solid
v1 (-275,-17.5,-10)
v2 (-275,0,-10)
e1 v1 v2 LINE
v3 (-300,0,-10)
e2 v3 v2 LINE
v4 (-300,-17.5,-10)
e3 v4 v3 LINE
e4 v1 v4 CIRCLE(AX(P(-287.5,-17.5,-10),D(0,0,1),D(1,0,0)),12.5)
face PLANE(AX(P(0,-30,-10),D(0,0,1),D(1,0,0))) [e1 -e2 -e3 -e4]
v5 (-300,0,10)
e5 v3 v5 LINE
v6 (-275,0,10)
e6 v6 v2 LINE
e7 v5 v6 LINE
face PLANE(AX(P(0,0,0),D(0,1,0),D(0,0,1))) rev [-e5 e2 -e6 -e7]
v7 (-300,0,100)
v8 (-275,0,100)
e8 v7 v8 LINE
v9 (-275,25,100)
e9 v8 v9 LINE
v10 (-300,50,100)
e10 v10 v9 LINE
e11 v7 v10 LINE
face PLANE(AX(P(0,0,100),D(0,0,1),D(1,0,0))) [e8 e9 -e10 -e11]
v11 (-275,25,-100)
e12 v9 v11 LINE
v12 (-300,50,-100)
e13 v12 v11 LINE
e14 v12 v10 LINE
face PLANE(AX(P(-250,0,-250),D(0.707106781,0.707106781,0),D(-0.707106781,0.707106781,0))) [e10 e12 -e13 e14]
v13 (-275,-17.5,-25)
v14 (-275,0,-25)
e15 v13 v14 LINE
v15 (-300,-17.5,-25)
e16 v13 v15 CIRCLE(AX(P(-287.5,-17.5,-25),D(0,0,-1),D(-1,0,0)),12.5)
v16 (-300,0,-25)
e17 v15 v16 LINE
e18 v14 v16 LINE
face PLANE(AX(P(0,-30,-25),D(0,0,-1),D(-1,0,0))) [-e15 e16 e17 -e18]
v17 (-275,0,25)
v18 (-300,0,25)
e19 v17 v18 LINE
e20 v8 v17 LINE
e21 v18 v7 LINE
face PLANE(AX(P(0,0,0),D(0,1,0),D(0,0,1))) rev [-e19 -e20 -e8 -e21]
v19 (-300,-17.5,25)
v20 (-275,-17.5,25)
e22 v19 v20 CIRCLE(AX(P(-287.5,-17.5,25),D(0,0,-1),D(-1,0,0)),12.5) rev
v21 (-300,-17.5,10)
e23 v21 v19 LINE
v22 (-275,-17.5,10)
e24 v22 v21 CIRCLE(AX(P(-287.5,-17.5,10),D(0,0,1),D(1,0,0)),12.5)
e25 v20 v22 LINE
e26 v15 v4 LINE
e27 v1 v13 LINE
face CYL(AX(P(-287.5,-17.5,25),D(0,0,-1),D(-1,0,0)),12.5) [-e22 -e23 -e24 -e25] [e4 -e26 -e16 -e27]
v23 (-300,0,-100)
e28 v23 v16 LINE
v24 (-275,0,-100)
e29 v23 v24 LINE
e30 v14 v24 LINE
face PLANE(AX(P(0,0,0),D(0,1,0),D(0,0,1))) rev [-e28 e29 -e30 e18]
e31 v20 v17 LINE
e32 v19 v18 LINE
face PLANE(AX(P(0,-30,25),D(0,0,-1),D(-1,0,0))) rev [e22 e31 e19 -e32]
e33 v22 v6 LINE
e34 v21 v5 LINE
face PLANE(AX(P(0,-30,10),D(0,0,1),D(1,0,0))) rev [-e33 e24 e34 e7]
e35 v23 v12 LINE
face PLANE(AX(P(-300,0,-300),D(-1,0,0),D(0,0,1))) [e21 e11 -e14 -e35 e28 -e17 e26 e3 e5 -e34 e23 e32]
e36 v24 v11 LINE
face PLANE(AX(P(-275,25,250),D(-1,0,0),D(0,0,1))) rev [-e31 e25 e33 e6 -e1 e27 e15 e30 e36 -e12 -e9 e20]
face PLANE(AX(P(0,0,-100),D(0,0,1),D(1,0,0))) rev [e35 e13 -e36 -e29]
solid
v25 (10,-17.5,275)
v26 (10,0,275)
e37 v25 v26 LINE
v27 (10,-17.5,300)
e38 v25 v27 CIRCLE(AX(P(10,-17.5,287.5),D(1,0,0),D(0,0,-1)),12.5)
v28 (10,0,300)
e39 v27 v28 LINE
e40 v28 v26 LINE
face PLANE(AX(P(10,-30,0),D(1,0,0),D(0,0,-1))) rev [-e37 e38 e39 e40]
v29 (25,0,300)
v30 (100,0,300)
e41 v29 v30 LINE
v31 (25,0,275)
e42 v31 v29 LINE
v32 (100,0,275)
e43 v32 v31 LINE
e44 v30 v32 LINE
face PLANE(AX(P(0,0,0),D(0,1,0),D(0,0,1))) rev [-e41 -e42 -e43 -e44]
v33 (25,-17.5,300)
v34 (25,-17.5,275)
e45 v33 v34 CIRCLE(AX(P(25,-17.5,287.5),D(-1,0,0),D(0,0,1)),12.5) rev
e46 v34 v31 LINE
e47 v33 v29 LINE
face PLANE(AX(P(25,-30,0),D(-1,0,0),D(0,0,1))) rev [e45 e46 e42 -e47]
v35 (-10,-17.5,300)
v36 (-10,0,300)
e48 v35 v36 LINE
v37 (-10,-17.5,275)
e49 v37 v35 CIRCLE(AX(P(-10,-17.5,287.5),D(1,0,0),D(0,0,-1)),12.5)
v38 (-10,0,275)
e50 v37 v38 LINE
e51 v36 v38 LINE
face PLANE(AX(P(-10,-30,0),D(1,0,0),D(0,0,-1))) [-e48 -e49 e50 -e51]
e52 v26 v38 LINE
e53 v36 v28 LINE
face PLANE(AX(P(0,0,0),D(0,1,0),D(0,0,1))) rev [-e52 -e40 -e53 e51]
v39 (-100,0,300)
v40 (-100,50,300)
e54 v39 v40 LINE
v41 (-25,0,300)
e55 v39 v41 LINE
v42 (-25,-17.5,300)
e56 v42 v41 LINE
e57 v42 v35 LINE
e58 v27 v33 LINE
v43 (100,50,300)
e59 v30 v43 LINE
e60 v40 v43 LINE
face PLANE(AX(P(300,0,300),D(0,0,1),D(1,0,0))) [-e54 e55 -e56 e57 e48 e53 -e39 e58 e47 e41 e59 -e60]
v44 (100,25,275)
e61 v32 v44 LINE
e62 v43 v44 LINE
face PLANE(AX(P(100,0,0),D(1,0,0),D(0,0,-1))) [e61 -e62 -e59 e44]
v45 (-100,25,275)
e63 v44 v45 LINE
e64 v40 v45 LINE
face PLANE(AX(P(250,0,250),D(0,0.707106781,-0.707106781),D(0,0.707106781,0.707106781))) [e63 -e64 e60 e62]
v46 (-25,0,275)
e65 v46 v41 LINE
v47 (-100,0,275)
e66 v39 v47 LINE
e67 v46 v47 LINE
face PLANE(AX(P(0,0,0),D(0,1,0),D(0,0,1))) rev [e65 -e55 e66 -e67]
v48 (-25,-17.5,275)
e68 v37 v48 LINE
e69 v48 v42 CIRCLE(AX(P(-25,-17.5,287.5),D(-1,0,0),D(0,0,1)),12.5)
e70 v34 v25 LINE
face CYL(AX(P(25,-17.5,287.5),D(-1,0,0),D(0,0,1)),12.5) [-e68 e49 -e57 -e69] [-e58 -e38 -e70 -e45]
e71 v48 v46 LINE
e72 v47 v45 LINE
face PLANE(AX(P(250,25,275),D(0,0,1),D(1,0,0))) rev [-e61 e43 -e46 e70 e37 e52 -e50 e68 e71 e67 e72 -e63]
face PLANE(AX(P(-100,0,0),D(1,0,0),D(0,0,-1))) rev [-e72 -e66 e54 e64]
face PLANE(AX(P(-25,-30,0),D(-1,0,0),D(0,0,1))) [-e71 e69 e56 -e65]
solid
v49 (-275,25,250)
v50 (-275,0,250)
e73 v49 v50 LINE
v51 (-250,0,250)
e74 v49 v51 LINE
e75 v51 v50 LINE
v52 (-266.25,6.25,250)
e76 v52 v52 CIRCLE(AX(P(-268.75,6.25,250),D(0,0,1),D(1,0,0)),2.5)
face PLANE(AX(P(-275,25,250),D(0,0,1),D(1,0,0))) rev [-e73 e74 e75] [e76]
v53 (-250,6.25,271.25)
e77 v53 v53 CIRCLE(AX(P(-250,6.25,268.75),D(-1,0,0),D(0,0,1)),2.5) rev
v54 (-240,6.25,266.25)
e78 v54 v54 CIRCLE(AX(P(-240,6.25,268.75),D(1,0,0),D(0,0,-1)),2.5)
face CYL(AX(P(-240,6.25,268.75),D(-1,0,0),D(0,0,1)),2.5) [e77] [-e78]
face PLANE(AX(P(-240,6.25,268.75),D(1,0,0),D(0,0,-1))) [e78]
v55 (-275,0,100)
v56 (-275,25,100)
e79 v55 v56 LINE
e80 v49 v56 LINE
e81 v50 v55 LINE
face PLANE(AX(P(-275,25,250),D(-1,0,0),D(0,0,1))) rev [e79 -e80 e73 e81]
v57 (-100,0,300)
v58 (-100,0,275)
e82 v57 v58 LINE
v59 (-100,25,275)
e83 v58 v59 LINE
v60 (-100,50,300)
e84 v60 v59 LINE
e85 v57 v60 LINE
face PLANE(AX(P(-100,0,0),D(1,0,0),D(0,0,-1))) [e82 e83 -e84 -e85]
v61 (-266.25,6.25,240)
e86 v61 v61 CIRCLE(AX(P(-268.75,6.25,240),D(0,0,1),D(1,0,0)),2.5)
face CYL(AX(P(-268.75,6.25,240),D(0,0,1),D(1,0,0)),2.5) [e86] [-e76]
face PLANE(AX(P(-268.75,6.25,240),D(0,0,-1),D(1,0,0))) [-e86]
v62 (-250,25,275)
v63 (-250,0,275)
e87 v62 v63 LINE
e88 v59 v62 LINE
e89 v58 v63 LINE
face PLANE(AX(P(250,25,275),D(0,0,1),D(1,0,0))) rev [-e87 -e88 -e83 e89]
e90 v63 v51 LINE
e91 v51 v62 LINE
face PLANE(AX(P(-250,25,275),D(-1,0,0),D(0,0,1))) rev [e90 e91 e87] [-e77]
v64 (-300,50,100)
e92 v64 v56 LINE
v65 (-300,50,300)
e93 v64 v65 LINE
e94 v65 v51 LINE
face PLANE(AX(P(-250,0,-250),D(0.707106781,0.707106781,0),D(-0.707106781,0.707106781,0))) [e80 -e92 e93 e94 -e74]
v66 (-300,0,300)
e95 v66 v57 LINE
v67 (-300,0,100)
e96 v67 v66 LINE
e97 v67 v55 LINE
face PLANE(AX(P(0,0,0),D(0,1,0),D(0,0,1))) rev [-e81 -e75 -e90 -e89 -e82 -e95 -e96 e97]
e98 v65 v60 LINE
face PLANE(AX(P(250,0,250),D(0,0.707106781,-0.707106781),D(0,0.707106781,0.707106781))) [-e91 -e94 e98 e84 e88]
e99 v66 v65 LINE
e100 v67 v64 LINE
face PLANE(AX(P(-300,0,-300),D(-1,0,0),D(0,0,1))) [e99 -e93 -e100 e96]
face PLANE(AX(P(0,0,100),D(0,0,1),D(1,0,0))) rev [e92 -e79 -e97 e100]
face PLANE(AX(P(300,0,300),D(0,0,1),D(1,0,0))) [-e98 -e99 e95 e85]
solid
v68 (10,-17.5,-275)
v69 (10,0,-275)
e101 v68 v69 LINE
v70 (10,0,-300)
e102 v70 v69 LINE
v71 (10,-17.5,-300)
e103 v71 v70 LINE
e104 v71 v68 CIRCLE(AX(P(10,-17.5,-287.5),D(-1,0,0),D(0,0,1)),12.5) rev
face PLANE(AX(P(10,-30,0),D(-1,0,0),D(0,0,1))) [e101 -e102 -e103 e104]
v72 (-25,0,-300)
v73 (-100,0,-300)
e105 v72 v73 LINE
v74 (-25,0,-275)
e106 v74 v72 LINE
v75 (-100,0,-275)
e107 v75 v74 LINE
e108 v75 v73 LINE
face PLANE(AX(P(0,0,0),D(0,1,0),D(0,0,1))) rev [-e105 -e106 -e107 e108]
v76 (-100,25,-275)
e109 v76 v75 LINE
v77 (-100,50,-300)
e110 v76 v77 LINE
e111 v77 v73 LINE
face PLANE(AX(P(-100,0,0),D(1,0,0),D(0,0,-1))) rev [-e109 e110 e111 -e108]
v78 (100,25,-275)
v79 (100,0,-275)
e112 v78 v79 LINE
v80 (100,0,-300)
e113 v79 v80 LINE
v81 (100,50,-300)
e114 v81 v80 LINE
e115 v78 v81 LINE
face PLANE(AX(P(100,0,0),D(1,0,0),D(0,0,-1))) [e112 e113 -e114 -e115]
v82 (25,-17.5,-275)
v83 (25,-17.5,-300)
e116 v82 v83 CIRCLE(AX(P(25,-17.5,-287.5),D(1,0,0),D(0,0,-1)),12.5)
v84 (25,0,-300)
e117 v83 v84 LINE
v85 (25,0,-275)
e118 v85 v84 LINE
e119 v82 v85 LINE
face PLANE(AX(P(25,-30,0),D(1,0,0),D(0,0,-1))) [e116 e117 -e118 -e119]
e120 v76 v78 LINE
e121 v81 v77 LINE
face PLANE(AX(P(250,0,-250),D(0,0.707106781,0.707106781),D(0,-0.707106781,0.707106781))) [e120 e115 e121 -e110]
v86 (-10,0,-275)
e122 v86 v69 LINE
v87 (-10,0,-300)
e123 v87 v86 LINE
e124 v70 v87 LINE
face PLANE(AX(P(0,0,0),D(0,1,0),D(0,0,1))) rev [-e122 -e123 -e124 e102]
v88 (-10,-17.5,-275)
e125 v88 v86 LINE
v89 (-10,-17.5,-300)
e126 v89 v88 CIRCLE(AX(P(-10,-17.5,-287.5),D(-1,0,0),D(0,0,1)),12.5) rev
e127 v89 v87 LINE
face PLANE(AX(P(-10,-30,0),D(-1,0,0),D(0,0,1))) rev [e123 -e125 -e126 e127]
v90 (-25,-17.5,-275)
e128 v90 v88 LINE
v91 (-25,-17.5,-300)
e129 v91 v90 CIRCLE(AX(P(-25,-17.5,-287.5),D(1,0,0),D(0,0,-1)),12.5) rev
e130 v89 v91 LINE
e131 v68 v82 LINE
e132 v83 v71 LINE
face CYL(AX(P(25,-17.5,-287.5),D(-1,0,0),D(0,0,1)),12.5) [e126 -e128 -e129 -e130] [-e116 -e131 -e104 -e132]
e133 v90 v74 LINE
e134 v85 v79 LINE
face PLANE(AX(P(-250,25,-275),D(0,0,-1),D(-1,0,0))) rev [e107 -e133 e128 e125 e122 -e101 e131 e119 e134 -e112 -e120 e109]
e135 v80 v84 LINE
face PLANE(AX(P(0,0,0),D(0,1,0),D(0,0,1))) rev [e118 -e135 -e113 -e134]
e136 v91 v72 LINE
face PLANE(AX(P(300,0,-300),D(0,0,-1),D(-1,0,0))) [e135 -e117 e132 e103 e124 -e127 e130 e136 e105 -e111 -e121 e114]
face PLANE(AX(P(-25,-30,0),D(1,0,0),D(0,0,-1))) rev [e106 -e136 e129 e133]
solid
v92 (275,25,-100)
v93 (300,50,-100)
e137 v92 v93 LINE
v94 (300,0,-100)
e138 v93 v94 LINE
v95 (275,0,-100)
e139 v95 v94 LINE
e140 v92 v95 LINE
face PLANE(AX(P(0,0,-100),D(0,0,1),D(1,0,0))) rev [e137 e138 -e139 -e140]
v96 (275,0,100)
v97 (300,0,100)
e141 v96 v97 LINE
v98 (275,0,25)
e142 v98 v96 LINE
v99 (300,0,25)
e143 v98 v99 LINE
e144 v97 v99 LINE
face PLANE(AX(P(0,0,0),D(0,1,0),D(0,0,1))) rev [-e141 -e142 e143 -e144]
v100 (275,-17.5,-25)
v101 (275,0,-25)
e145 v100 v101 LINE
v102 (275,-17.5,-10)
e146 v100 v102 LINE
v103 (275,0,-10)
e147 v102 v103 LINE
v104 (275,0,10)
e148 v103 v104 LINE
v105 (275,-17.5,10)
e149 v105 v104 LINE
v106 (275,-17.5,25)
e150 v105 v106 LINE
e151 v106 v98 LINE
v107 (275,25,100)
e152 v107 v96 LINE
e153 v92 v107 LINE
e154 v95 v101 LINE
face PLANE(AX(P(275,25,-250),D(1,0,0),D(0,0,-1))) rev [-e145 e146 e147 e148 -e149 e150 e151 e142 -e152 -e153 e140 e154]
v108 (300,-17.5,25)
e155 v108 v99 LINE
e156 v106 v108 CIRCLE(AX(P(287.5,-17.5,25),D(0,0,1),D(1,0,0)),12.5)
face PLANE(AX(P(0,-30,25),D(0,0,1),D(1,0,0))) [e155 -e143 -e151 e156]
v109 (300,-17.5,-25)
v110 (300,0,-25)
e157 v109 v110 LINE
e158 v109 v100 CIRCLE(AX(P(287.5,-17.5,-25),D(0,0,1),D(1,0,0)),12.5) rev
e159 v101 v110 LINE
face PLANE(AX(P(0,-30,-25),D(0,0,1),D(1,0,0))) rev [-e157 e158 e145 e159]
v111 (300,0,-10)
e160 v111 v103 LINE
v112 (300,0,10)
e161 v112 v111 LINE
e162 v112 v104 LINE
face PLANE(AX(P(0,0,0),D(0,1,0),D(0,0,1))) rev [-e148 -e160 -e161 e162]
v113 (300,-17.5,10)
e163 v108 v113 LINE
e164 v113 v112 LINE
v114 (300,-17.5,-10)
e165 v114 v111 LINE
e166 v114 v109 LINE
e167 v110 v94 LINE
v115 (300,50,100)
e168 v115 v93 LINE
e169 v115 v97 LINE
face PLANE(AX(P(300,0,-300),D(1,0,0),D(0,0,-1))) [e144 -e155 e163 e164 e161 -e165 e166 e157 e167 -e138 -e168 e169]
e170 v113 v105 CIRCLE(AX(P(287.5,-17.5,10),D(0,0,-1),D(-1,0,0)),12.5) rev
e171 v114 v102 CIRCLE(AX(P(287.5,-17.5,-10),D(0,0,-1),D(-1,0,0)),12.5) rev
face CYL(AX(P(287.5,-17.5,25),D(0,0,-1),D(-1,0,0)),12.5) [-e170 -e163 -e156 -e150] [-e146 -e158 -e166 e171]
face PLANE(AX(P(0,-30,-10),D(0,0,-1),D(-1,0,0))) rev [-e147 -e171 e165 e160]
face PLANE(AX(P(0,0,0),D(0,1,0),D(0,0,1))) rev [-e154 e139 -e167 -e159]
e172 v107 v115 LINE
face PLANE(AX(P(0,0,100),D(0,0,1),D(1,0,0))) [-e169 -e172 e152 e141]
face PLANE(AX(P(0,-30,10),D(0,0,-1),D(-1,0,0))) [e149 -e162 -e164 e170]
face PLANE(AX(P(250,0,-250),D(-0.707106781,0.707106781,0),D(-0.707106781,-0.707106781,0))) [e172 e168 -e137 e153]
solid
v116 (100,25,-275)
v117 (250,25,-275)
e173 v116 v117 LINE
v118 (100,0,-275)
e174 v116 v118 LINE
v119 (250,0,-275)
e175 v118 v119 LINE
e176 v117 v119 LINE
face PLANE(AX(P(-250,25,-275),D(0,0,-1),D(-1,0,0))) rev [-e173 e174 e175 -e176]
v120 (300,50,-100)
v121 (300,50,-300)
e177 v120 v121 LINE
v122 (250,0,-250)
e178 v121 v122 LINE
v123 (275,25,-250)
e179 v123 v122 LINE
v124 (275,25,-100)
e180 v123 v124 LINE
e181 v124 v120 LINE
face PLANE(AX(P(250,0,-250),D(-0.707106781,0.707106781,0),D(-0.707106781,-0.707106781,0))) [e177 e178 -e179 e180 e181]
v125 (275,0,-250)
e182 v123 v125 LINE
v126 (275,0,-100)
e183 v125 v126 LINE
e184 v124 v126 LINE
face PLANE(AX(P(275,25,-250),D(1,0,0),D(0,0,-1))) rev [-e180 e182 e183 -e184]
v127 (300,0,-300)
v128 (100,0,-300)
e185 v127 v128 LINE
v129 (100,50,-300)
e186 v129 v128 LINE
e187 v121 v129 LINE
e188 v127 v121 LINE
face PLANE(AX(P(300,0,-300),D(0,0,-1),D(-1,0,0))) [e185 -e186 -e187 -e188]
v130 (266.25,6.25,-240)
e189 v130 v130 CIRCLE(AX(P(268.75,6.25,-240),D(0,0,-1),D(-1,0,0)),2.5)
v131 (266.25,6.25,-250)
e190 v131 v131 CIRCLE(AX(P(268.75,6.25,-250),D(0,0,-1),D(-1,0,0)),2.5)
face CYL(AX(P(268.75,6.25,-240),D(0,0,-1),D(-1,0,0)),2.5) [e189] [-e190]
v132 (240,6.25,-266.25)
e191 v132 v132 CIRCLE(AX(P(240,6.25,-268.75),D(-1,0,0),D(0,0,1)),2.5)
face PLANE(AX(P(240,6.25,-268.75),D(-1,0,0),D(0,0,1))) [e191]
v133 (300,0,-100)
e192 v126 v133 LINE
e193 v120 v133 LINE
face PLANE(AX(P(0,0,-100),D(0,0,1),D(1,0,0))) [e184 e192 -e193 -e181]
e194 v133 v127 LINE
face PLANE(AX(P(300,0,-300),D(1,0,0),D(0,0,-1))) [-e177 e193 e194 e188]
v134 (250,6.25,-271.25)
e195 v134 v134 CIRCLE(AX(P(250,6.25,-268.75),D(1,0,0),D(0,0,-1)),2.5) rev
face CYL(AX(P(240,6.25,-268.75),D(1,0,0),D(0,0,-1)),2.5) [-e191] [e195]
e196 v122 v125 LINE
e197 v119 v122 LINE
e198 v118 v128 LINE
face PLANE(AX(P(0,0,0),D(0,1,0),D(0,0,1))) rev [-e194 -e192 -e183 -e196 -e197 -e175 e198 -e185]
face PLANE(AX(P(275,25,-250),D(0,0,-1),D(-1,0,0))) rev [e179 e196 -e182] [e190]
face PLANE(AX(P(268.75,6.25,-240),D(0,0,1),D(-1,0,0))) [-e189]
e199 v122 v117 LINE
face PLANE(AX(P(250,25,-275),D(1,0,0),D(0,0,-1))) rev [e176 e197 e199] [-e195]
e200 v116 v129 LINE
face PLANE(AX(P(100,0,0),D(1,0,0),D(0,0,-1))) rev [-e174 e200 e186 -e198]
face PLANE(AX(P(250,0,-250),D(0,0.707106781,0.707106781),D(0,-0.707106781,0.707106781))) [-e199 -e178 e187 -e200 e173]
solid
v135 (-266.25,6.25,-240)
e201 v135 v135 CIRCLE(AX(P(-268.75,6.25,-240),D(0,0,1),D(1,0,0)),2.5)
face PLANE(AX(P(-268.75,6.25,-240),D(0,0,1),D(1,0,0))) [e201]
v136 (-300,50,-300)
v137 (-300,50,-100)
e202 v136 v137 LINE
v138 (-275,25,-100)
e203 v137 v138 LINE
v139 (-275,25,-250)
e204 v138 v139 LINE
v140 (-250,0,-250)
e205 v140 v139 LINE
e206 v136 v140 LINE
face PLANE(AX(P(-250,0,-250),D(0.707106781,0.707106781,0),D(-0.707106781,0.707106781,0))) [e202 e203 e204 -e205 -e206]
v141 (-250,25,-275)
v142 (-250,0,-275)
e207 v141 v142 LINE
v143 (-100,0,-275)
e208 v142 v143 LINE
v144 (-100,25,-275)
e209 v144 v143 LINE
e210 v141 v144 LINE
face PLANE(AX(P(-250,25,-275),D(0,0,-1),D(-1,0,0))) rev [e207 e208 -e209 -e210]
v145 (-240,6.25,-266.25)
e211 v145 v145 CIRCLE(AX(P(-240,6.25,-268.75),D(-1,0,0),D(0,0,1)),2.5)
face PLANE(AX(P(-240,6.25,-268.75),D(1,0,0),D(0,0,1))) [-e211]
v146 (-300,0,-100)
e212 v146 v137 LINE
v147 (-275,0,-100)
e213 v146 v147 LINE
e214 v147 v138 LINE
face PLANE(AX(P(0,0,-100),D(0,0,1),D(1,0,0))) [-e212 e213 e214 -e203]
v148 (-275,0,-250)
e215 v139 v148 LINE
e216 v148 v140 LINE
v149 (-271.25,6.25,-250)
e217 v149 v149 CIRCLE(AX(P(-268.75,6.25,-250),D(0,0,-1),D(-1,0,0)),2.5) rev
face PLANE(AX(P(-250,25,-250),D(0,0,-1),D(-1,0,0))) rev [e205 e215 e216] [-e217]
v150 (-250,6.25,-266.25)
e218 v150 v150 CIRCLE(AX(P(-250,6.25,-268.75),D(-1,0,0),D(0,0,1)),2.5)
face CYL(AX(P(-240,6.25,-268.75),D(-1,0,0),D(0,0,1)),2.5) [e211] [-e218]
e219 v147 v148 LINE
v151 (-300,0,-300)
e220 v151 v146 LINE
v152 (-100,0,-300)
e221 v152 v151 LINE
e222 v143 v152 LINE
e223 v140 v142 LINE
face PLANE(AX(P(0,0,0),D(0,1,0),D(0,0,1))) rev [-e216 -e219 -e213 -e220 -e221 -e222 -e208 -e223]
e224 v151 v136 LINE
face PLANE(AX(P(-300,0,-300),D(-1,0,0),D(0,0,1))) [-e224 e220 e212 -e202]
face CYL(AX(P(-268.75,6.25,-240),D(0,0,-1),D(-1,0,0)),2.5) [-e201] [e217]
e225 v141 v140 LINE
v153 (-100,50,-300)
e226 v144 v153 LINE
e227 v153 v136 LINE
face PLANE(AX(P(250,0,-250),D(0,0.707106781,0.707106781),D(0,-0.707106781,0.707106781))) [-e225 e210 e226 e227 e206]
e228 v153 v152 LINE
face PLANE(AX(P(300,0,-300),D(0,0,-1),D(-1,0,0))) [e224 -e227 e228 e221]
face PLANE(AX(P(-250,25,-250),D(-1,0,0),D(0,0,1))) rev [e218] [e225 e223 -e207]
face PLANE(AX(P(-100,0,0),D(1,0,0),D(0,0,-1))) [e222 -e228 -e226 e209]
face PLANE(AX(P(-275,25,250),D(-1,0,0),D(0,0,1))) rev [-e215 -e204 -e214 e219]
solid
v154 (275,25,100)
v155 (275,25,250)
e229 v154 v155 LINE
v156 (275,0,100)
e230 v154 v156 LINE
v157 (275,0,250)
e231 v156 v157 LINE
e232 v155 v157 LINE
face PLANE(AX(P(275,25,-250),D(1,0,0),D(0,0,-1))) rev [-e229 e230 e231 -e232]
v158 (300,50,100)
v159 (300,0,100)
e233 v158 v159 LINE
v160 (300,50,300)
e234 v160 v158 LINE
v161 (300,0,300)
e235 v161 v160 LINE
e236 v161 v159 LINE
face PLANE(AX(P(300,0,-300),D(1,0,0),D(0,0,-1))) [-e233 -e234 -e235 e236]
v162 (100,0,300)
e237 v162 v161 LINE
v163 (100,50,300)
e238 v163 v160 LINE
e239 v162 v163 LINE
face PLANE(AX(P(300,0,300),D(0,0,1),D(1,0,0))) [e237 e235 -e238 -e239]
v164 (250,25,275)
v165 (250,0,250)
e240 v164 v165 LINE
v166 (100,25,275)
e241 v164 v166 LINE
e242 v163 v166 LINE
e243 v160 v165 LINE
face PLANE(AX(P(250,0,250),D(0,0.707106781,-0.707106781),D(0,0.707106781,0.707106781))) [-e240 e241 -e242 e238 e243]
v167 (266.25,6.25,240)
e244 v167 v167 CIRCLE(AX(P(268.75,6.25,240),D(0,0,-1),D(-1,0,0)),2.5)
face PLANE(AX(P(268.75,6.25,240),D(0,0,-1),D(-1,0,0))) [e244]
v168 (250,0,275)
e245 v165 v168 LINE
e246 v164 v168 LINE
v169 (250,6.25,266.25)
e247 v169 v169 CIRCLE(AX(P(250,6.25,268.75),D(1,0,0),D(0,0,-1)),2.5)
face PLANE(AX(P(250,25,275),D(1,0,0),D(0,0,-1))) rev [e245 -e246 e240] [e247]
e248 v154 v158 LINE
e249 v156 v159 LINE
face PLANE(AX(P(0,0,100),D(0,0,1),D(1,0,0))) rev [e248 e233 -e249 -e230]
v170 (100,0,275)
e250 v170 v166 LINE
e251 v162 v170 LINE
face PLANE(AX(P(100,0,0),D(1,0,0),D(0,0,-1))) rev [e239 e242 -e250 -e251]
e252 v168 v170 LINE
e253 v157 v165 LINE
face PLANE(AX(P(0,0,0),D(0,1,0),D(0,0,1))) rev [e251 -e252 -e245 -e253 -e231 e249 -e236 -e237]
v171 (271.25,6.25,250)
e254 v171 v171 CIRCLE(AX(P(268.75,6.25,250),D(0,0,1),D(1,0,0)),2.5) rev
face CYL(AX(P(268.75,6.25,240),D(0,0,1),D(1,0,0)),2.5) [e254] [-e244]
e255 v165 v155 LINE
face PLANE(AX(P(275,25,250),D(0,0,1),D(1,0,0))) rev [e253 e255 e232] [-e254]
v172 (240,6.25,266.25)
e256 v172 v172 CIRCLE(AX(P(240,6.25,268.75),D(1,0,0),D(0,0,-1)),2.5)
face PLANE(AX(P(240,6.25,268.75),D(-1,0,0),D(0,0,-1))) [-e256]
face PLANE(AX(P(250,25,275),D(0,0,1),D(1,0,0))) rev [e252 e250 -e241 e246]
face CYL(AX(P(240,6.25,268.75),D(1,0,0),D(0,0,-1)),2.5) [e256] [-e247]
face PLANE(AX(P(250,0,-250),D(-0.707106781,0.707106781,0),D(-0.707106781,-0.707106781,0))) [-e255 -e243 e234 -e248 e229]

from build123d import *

# Parameters (mm, degrees)
SKETCH1_W                                  = 700
SKETCH1_H                                  = 700
SKETCH1_W_2                                = 500
SKETCH1_H_2                                = 500
BOSS_EXTRUDE2_DEPTH                        = 50
BOSS_EXTRUDE2_DRAFT                        = 45
SKETCH6_W                                  = 700
SKETCH6_H                                  = 700
SKETCH6_W_2                                = 600
SKETCH6_H_2                                = 600
CUT_EXTRUDE1_DEPTH                         = 50
CUT_EXTRUDE2_DEPTH                         = 25
SKETCH8_R                                  = 2.5
BOSS_EXTRUDE3_DEPTH                        = 10
MIRROR1_AT_THE_SECOND_PLANE_COPY_1_SKETC_R = 2.5
MIRROR1_AT_THE_SECOND_PLANE_COPY_1_DEPTH   = 10
MIRROR2_COPY_1_SKETCH_R                    = 2.5
MIRROR2_COPY_1_DEPTH                       = 10
MIRROR2_COPY_2_SKETCH_R                    = 2.5
MIRROR2_COPY_2_DEPTH                       = 10
MIRROR2_COPY_3_SKETCH_R                    = 2.5
MIRROR2_COPY_3_DEPTH                       = 10
SKETCH9_W                                  = 25
SKETCH9_H                                  = 15
BOSS_EXTRUDE4_DEPTH                        = 30
SKETCH11_R                                 = 12.5
BOSS_EXTRUDE5_DEPTH                        = 50
FILLET1_R                                  = 12.5
FILLET1_OF_MIRROR3_R                       = 12.5
MIRROR4_START                              = -25
MIRROR4_OUTLINE_R                          = 12.5
MIRROR4_DEPTH                              = 50
MIRROR4_2_DEPTH                            = 15
MIRROR4_START_2                            = 10
MIRROR4_3_DEPTH                            = 15
INTERSECT1_START                           = -300
INTERSECT1_DEPTH                           = 200
INTERSECT1_2_DEPTH                         = 50
INTERSECT1_START_2                         = -250
INTERSECT1_3_OUTLINE_R                     = 2.5
INTERSECT1_3_DEPTH                         = 10
INTERSECT1_4_DEPTH                         = 200
INTERSECT1_START_3                         = -279.452
INTERSECT1_5_DEPTH                         = 29.452
INTERSECT1_6_OUTLINE_R                     = 2.5
INTERSECT1_6_DEPTH                         = 10
INTERSECT1_7_DEPTH                         = 600
INTERSECT1_8_DEPTH                         = 200
INTERSECT1_START_4                         = 100
INTERSECT1_9_DEPTH                         = 200
INTERSECT1_START_5                         = -100
INTERSECT1_10_DEPTH                        = 200
INTERSECT1_START_6                         = -25
INTERSECT1_11_OUTLINE_R                    = 12.5
INTERSECT1_11_DEPTH                        = 50
INTERSECT1_12_DEPTH                        = 15
INTERSECT1_START_7                         = 10
INTERSECT1_13_DEPTH                        = 15
INTERSECT1_14_DEPTH                        = 200
INTERSECT1_START_8                         = 250
INTERSECT1_15_DEPTH                        = 50
INTERSECT1_START_9                         = 240
INTERSECT1_16_OUTLINE_R                    = 2.5
INTERSECT1_16_DEPTH                        = 10
INTERSECT1_17_DEPTH                        = 200
INTERSECT1_START_10                        = -280.548
INTERSECT1_18_DEPTH                        = 30.548
INTERSECT1_19_OUTLINE_R                    = 2.5
INTERSECT1_19_DEPTH                        = 10
INTERSECT1_20_DEPTH                        = 200
INTERSECT1_21_OUTLINE_R                    = 12.5
INTERSECT1_21_DEPTH                        = 50
INTERSECT1_22_DEPTH                        = 15
INTERSECT1_23_DEPTH                        = 15
INTERSECT1_24_DEPTH                        = 200
INTERSECT1_25_OUTLINE_R                    = 12.5
INTERSECT1_25_DEPTH                        = 50
INTERSECT1_26_DEPTH                        = 15
INTERSECT1_27_DEPTH                        = 15
INTERSECT1_28_DEPTH                        = 200
INTERSECT1_29_DEPTH                        = 50
INTERSECT1_30_OUTLINE_R                    = 2.5
INTERSECT1_30_DEPTH                        = 10
INTERSECT1_31_DEPTH                        = 200
INTERSECT1_32_DEPTH                        = 30.548
INTERSECT1_33_OUTLINE_R                    = 2.5
INTERSECT1_33_DEPTH                        = 10
INTERSECT1_34_DEPTH                        = 200
INTERSECT1_35_DEPTH                        = 50
INTERSECT1_36_OUTLINE_R                    = 2.5
INTERSECT1_36_DEPTH                        = 10
INTERSECT1_37_DEPTH                        = 200
INTERSECT1_38_DEPTH                        = 30.548
INTERSECT1_39_OUTLINE_R                    = 2.5
INTERSECT1_39_DEPTH                        = 10


with BuildPart() as part:
    # Sketch1 → Boss-Extrude2 (with draft: the straight prism first)
    with BuildSketch(Plane(origin=(0, 0, 0), x_dir=(1, 0, 0), z_dir=(0, 1, 0))):
        Rectangle(SKETCH1_W, SKETCH1_H)
        Rectangle(SKETCH1_W_2, SKETCH1_H_2, mode=Mode.SUBTRACT)
    extrude(amount=BOSS_EXTRUDE2_DEPTH)
    # Boss-Extrude2: the draft: its side faces are tilted about the plane it starts from
    boss_extrude2_sides = [part.faces().sort_by_distance(p)[0] for p in [
        (-350, 25, 0),
        (0, 25, 350),
        (350, 25, 0),
        (0, 25, -350),
        (250, 25, 0),
        (0, 25, 250),
        (-250, 25, 0),
        (0, 25, -250),
    ]]
    draft(boss_extrude2_sides, Plane(origin=(0, 0, 0), x_dir=(1, 0, 0), z_dir=(0, 1, 0)), BOSS_EXTRUDE2_DRAFT)

    # Sketch6 → Cut-Extrude1 (cut)
    with BuildSketch(Plane(origin=(0, 50, 0), x_dir=(1, 0, 0), z_dir=(0, 1, 0))):
        Rectangle(SKETCH6_W, SKETCH6_H)
        Rectangle(SKETCH6_W_2, SKETCH6_H_2, mode=Mode.SUBTRACT)
    extrude(amount=-CUT_EXTRUDE1_DEPTH, mode=Mode.SUBTRACT)

    # Sketch7 → Cut-Extrude2 (cut)
    with BuildSketch(Plane.XZ):
        Polygon((-275, 250), (-250, 250), (-250, 275), (250, 275), (250, 250), (275, 250), (275, -250), (250, -250), (250, -275), (-250, -275), (-250, -250), (-275, -250), align=None)
    extrude(amount=-CUT_EXTRUDE2_DEPTH, mode=Mode.SUBTRACT)

    # Sketch8 → Boss-Extrude3 (add)
    with BuildSketch(Plane.XY.offset(-250)):
        with Locations(Location((-268.75, 6.25, 0), (0, 0, 180))):
            Circle(SKETCH8_R)
    boss_extrude3 = extrude(amount=BOSS_EXTRUDE3_DEPTH)

    # Mirror1: Boss-Extrude3 across plane
    add(boss_extrude3.mirror(Plane(origin=(0, 0, 0), x_dir=(0, 0, 1), z_dir=(1, 0, 0))))

    # Mirror1 at the second plane: Boss-Extrude3 across plane
    add(boss_extrude3.mirror(Plane.XY))

    # Mirror1 at the second plane copy 1 sketc → Mirror1 at the second plane copy 1 (add)
    with BuildSketch(Plane(origin=(0, 0, 250), x_dir=(-1, 0, 0), z_dir=(0, 0, -1))):
        with Locations(Location((-268.75, 6.25, 0), (0, 0, 180))):
            Circle(MIRROR1_AT_THE_SECOND_PLANE_COPY_1_SKETC_R)
    extrude(amount=MIRROR1_AT_THE_SECOND_PLANE_COPY_1_DEPTH)

    # Mirror2: Boss-Extrude3 across plane
    add(boss_extrude3.mirror(Plane(origin=(0, 0, 0), x_dir=(0.7071067811865477, 0, 0.7071067811865474), z_dir=(-0.7071067811865474, 0, 0.7071067811865477))))

    # Mirror2 copy 1 sketch → Mirror2 copy 1 (add)
    with BuildSketch(Plane(origin=(-250, 0, 0), x_dir=(0, 0, -1), z_dir=(1, 0, 0))):
        with Locations(Location((-268.75, 6.25, 0), (0, 0, 180))):
            Circle(MIRROR2_COPY_1_SKETCH_R)
    extrude(amount=MIRROR2_COPY_1_DEPTH)

    # Mirror2 copy 2 sketch → Mirror2 copy 2 (add)
    with BuildSketch(Plane.ZY.offset(-250)):
        with Locations(Location((-268.75, 6.25, 0), (0, 0, 180))):
            Circle(MIRROR2_COPY_2_SKETCH_R)
    extrude(amount=MIRROR2_COPY_2_DEPTH)

    # Mirror2 copy 3 sketch → Mirror2 copy 3 (add)
    with BuildSketch(Plane(origin=(250, 0, 0), x_dir=(0, 0, -1), z_dir=(-1, 0, 0))):
        with Locations((-268.75, -6.25)):
            Circle(MIRROR2_COPY_3_SKETCH_R)
    extrude(amount=MIRROR2_COPY_3_DEPTH)

    # Sketch9 → Boss-Extrude4 (add)
    with BuildSketch(Plane.XZ):
        with Locations((-287.5, 17.5)):
            Rectangle(SKETCH9_W, SKETCH9_H)
        with Locations((-287.5, -17.5)):
            Rectangle(SKETCH9_W, SKETCH9_H)
    boss_extrude4 = extrude(amount=BOSS_EXTRUDE4_DEPTH)

    # Sketch11 → Boss-Extrude5 (add)
    with BuildSketch(Plane(origin=(0, 0, -25), x_dir=(-1, 0, 0), z_dir=(0, 0, -1))):
        with Locations((287.5, -17.5)):
            Circle(SKETCH11_R)
    boss_extrude5 = extrude(amount=-BOSS_EXTRUDE5_DEPTH)

    # Fillet1
    fillet1_edges = [part.edges().sort_by_distance(p)[0] for p in [
        (-275, -30, -17.5),
        (-275, -30, 17.5),
        (-300, -30, 17.5),
        (-300, -30, -17.5),
    ]]
    fillet(fillet1_edges, radius=FILLET1_R - 0.0001)  # a hair under: the kernel refuses the full size

    # Mirror3: Boss-Extrude4, Boss-Extrude5 across plane
    add(boss_extrude4.mirror(Plane(origin=(0, 0, 0), x_dir=(0, 0, 1), z_dir=(1, 0, 0))))
    add(boss_extrude5.mirror(Plane(origin=(0, 0, 0), x_dir=(0, 0, 1), z_dir=(1, 0, 0))))

    # Fillet1 of Mirror3
    fillet1_of_mirror3_edges = [part.edges().sort_by_distance(p)[0] for p in [
        (275, -30, -17.5),
        (275, -30, 17.5),
        (300, -30, 17.5),
        (300, -30, -17.5),
    ]]
    fillet(fillet1_of_mirror3_edges, radius=FILLET1_OF_MIRROR3_R - 0.0001)  # a hair under: the kernel refuses the full size



with BuildPart() as body_2:
    # Mirror4: read off the stored shape, not the designer's step
    # Mirror4 outline → Mirror4 (new body)
    with BuildSketch(Plane.YZ.offset(MIRROR4_START)):
        with Locations((-17.5, 287.5)):
            Circle(MIRROR4_OUTLINE_R)
        with Locations((-17.5, -287.5)):
            Circle(MIRROR4_OUTLINE_R)
    extrude(amount=MIRROR4_DEPTH)


with BuildPart() as part_1:
    add(part.part)

    add(body_2.part)  # Mirror4 2 merges body 2
    # Mirror4 2 outline → Mirror4 2 (add)
    with BuildSketch(Plane.YZ.offset(MIRROR4_START)):
        with BuildLine():
            ThreePointArc((-17.5, 300), (-5, 287.5), (-17.5, 275))
            Line((-17.5, 275), (0, 275))
            Line((0, 275), (0, 300))
            Line((0, 300), (-17.5, 300))
        make_face()
        with BuildLine():
            ThreePointArc((-17.5, -275), (-5, -287.5), (-17.5, -300))
            Line((-17.5, -300), (0, -300))
            Line((0, -300), (0, -275))
            Line((0, -275), (-17.5, -275))
        make_face()
    extrude(amount=MIRROR4_2_DEPTH)

    # Mirror4 3 outline → Mirror4 3 (add)
    with BuildSketch(Plane.YZ.offset(MIRROR4_START_2)):
        with BuildLine():
            ThreePointArc((-17.5, 300), (-5, 287.5), (-17.5, 275))
            Line((-17.5, 275), (0, 275))
            Line((0, 275), (0, 300))
            Line((0, 300), (-17.5, 300))
        make_face()
        with BuildLine():
            ThreePointArc((-17.5, -275), (-5, -287.5), (-17.5, -300))
            Line((-17.5, -300), (0, -300))
            Line((0, -300), (0, -275))
            Line((0, -275), (-17.5, -275))
        make_face()
    extrude(amount=MIRROR4_3_DEPTH)

    # Intersect1 7 outline → Intersect1 7 (cut)
    with BuildSketch(Plane.XY.offset(INTERSECT1_START)):
        Polygon((302, 52), (-302, 52), (-302, 0), (-300, 0), (-300, 50), (-275, 25), (-275, -32), (302, -32), align=None)
    extrude(amount=INTERSECT1_7_DEPTH, mode=Mode.SUBTRACT)

    # Intersect1 8 outline → Intersect1 8 (cut)
    with BuildSketch(Plane.XY.offset(INTERSECT1_START)):
        Polygon((-300, 0), (-275, 0), (-275, 25), (-300, 50), align=None)
    extrude(amount=INTERSECT1_8_DEPTH, mode=Mode.SUBTRACT)

    # Intersect1 9 outline → Intersect1 9 (cut)
    with BuildSketch(Plane.XY.offset(INTERSECT1_START_4)):
        Polygon((-300, 0), (-275, 0), (-275, 25), (-300, 50), align=None)
    extrude(amount=INTERSECT1_9_DEPTH, mode=Mode.SUBTRACT)


with BuildPart() as body_2_2:
    # Intersect1: read off the stored shape, not the designer's step
    # Intersect1 outline → Intersect1 (new body)
    with BuildSketch(Plane.YZ.offset(INTERSECT1_START)):
        Polygon((0, -275), (0, -300), (50, -300), (25, -275), align=None)
    extrude(amount=INTERSECT1_DEPTH)

    # Intersect1 2 outline → Intersect1 2 (add)
    with BuildSketch(Plane.YZ.offset(INTERSECT1_START)):
        Polygon((0, -250), (0, -275), (25, -275), align=None)
    extrude(amount=INTERSECT1_2_DEPTH)

    # Intersect1 3 outline → Intersect1 3 (add)
    with BuildSketch(Plane.YZ.offset(INTERSECT1_START_2)):
        with Locations((6.25, -268.75)):
            Circle(INTERSECT1_3_OUTLINE_R)
    extrude(amount=INTERSECT1_3_DEPTH)

    # Intersect1 4 outline → Intersect1 4 (add)
    with BuildSketch(Plane.XY.offset(INTERSECT1_START)):
        Polygon((-275, 25), (-300, 50), (-300, 0), (-275, 0), align=None)
    extrude(amount=INTERSECT1_4_DEPTH)

    # Intersect1 5 outline → Intersect1 5 (add)
    with BuildSketch(Plane.XY.offset(INTERSECT1_START_3)):
        Polygon((-250, 0), (-275, 25), (-275, 0), align=None)
    extrude(amount=INTERSECT1_5_DEPTH)

    # Intersect1 6 outline → Intersect1 6 (add)
    with BuildSketch(Plane.XY.offset(INTERSECT1_START_2)):
        with Locations((-268.75, 6.25)):
            Circle(INTERSECT1_6_OUTLINE_R)
    extrude(amount=INTERSECT1_6_DEPTH)


with BuildPart() as body_3:
    # Intersect1 10 outline → Intersect1 10 (new body)
    with BuildSketch(Plane.YZ.offset(INTERSECT1_START_5)):
        Polygon((0, -275), (0, -300), (50, -300), (25, -275), align=None)
    extrude(amount=INTERSECT1_10_DEPTH)

    # Intersect1 11 outline → Intersect1 11 (add)
    with BuildSketch(Plane.YZ.offset(INTERSECT1_START_6)):
        with Locations((-17.5, -287.5)):
            Circle(INTERSECT1_11_OUTLINE_R)
    extrude(amount=INTERSECT1_11_DEPTH)

    # Intersect1 12 outline → Intersect1 12 (add)
    with BuildSketch(Plane.YZ.offset(INTERSECT1_START_6)):
        with BuildLine():
            Line((-17.5, -300), (0, -300))
            Line((0, -300), (0, -275))
            Line((0, -275), (-17.5, -275))
            ThreePointArc((-17.5, -275), (-5, -287.5), (-17.5, -300))
        make_face()
    extrude(amount=INTERSECT1_12_DEPTH)

    # Intersect1 13 outline → Intersect1 13 (add)
    with BuildSketch(Plane.YZ.offset(INTERSECT1_START_7)):
        with BuildLine():
            Line((-17.5, -300), (0, -300))
            Line((0, -300), (0, -275))
            Line((0, -275), (-17.5, -275))
            ThreePointArc((-17.5, -275), (-5, -287.5), (-17.5, -300))
        make_face()
    extrude(amount=INTERSECT1_13_DEPTH)


with BuildPart() as body_4:
    # Intersect1 14 outline → Intersect1 14 (new body)
    with BuildSketch(Plane.YZ.offset(INTERSECT1_START_4)):
        Polygon((0, -275), (0, -300), (50, -300), (25, -275), align=None)
    extrude(amount=INTERSECT1_14_DEPTH)

    # Intersect1 15 outline → Intersect1 15 (add)
    with BuildSketch(Plane.YZ.offset(INTERSECT1_START_8)):
        Polygon((0, -250), (0, -275), (25, -275), align=None)
    extrude(amount=INTERSECT1_15_DEPTH)

    # Intersect1 16 outline → Intersect1 16 (add)
    with BuildSketch(Plane.YZ.offset(INTERSECT1_START_9)):
        with Locations((6.25, -268.75)):
            Circle(INTERSECT1_16_OUTLINE_R)
    extrude(amount=INTERSECT1_16_DEPTH)

    # Intersect1 17 outline → Intersect1 17 (add)
    with BuildSketch(Plane.XY.offset(INTERSECT1_START)):
        Polygon((275, 0), (300, 0), (300, 50), (275, 25), align=None)
    extrude(amount=INTERSECT1_17_DEPTH)

    # Intersect1 18 outline → Intersect1 18 (add)
    with BuildSketch(Plane.XY.offset(INTERSECT1_START_10)):
        Polygon((250, 0), (275, 0), (275, 25), align=None)
    extrude(amount=INTERSECT1_18_DEPTH)

    # Intersect1 19 outline → Intersect1 19 (add)
    with BuildSketch(Plane.XY.offset(INTERSECT1_START_2)):
        with Locations((268.75, 6.25)):
            Circle(INTERSECT1_19_OUTLINE_R)
    extrude(amount=INTERSECT1_19_DEPTH)


with BuildPart() as body_5:
    # Intersect1 20 outline → Intersect1 20 (new body)
    with BuildSketch(Plane.XY.offset(INTERSECT1_START_5)):
        Polygon((275, 0), (300, 0), (300, 50), (275, 25), align=None)
    extrude(amount=INTERSECT1_20_DEPTH)

    # Intersect1 21 outline → Intersect1 21 (add)
    with BuildSketch(Plane.XY.offset(INTERSECT1_START_6)):
        with Locations((287.5, -17.5)):
            Circle(INTERSECT1_21_OUTLINE_R)
    extrude(amount=INTERSECT1_21_DEPTH)

    # Intersect1 22 outline → Intersect1 22 (add)
    with BuildSketch(Plane.XY.offset(INTERSECT1_START_6)):
        with BuildLine():
            ThreePointArc((275, -17.5), (287.5, -5), (300, -17.5))
            Line((300, -17.5), (300, 0))
            Line((300, 0), (275, 0))
            Line((275, 0), (275, -17.5))
        make_face()
    extrude(amount=INTERSECT1_22_DEPTH)

    # Intersect1 23 outline → Intersect1 23 (add)
    with BuildSketch(Plane.XY.offset(INTERSECT1_START_7)):
        with BuildLine():
            ThreePointArc((275, -17.5), (287.5, -5), (300, -17.5))
            Line((300, -17.5), (300, 0))
            Line((300, 0), (275, 0))
            Line((275, 0), (275, -17.5))
        make_face()
    extrude(amount=INTERSECT1_23_DEPTH)


with BuildPart() as body_6:
    # Intersect1 24 outline → Intersect1 24 (new body)
    with BuildSketch(Plane.YZ.offset(INTERSECT1_START_5)):
        Polygon((50, 300), (0, 300), (0, 275), (25, 275), align=None)
    extrude(amount=INTERSECT1_24_DEPTH)

    # Intersect1 25 outline → Intersect1 25 (add)
    with BuildSketch(Plane.YZ.offset(INTERSECT1_START_6)):
        with Locations((-17.5, 287.5)):
            Circle(INTERSECT1_25_OUTLINE_R)
    extrude(amount=INTERSECT1_25_DEPTH)

    # Intersect1 26 outline → Intersect1 26 (add)
    with BuildSketch(Plane.YZ.offset(INTERSECT1_START_6)):
        with BuildLine():
            ThreePointArc((-17.5, 300), (-5, 287.5), (-17.5, 275))
            Line((-17.5, 275), (0, 275))
            Line((0, 275), (0, 300))
            Line((0, 300), (-17.5, 300))
        make_face()
    extrude(amount=INTERSECT1_26_DEPTH)

    # Intersect1 27 outline → Intersect1 27 (add)
    with BuildSketch(Plane.YZ.offset(INTERSECT1_START_7)):
        with BuildLine():
            ThreePointArc((-17.5, 300), (-5, 287.5), (-17.5, 275))
            Line((-17.5, 275), (0, 275))
            Line((0, 275), (0, 300))
            Line((0, 300), (-17.5, 300))
        make_face()
    extrude(amount=INTERSECT1_27_DEPTH)


with BuildPart() as body_7:
    # Intersect1 28 outline → Intersect1 28 (new body)
    with BuildSketch(Plane.YZ.offset(INTERSECT1_START)):
        Polygon((0, 275), (25, 275), (50, 300), (0, 300), align=None)
    extrude(amount=INTERSECT1_28_DEPTH)

    # Intersect1 29 outline → Intersect1 29 (add)
    with BuildSketch(Plane.YZ.offset(INTERSECT1_START)):
        Polygon((0, 275), (0, 250), (25, 275), align=None)
    extrude(amount=INTERSECT1_29_DEPTH)

    # Intersect1 30 outline → Intersect1 30 (add)
    with BuildSketch(Plane.YZ.offset(INTERSECT1_START_2)):
        with Locations((6.25, 268.75)):
            Circle(INTERSECT1_30_OUTLINE_R)
    extrude(amount=INTERSECT1_30_DEPTH)

    # Intersect1 31 outline → Intersect1 31 (add)
    with BuildSketch(Plane.XY.offset(INTERSECT1_START_4)):
        Polygon((-275, 25), (-300, 50), (-300, 0), (-275, 0), align=None)
    extrude(amount=INTERSECT1_31_DEPTH)

    # Intersect1 32 outline → Intersect1 32 (add)
    with BuildSketch(Plane.XY.offset(INTERSECT1_START_8)):
        Polygon((-250, 0), (-275, 25), (-275, 0), align=None)
    extrude(amount=INTERSECT1_32_DEPTH)

    # Intersect1 33 outline → Intersect1 33 (add)
    with BuildSketch(Plane.XY.offset(INTERSECT1_START_9)):
        with Locations((-268.75, 6.25)):
            Circle(INTERSECT1_33_OUTLINE_R)
    extrude(amount=INTERSECT1_33_DEPTH)


with BuildPart() as body_8:
    # Intersect1 34 outline → Intersect1 34 (new body)
    with BuildSketch(Plane.XY.offset(INTERSECT1_START_4)):
        Polygon((275, 0), (300, 0), (300, 50), (275, 25), align=None)
    extrude(amount=INTERSECT1_34_DEPTH)

    # Intersect1 35 outline → Intersect1 35 (add)
    with BuildSketch(Plane.XY.offset(INTERSECT1_START_8)):
        Polygon((250, 0), (275, 0), (275, 25), align=None)
    extrude(amount=INTERSECT1_35_DEPTH)

    # Intersect1 36 outline → Intersect1 36 (add)
    with BuildSketch(Plane.XY.offset(INTERSECT1_START_9)):
        with Locations((268.75, 6.25)):
            Circle(INTERSECT1_36_OUTLINE_R)
    extrude(amount=INTERSECT1_36_DEPTH)

    # Intersect1 37 outline → Intersect1 37 (add)
    with BuildSketch(Plane.YZ.offset(INTERSECT1_START_4)):
        Polygon((0, 275), (25, 275), (50, 300), (0, 300), align=None)
    extrude(amount=INTERSECT1_37_DEPTH)

    # Intersect1 38 outline → Intersect1 38 (add)
    with BuildSketch(Plane.YZ.offset(INTERSECT1_START_8)):
        Polygon((0, 275), (0, 250), (25, 275), align=None)
    extrude(amount=INTERSECT1_38_DEPTH)

    # Intersect1 39 outline → Intersect1 39 (add)
    with BuildSketch(Plane.YZ.offset(INTERSECT1_START_9)):
        with Locations((6.25, 268.75)):
            Circle(INTERSECT1_39_OUTLINE_R)
    extrude(amount=INTERSECT1_39_DEPTH)


solid = Compound([part_1.part, body_2_2.part, body_3.part, body_4.part, body_5.part, body_6.part, body_7.part, body_8.part])
